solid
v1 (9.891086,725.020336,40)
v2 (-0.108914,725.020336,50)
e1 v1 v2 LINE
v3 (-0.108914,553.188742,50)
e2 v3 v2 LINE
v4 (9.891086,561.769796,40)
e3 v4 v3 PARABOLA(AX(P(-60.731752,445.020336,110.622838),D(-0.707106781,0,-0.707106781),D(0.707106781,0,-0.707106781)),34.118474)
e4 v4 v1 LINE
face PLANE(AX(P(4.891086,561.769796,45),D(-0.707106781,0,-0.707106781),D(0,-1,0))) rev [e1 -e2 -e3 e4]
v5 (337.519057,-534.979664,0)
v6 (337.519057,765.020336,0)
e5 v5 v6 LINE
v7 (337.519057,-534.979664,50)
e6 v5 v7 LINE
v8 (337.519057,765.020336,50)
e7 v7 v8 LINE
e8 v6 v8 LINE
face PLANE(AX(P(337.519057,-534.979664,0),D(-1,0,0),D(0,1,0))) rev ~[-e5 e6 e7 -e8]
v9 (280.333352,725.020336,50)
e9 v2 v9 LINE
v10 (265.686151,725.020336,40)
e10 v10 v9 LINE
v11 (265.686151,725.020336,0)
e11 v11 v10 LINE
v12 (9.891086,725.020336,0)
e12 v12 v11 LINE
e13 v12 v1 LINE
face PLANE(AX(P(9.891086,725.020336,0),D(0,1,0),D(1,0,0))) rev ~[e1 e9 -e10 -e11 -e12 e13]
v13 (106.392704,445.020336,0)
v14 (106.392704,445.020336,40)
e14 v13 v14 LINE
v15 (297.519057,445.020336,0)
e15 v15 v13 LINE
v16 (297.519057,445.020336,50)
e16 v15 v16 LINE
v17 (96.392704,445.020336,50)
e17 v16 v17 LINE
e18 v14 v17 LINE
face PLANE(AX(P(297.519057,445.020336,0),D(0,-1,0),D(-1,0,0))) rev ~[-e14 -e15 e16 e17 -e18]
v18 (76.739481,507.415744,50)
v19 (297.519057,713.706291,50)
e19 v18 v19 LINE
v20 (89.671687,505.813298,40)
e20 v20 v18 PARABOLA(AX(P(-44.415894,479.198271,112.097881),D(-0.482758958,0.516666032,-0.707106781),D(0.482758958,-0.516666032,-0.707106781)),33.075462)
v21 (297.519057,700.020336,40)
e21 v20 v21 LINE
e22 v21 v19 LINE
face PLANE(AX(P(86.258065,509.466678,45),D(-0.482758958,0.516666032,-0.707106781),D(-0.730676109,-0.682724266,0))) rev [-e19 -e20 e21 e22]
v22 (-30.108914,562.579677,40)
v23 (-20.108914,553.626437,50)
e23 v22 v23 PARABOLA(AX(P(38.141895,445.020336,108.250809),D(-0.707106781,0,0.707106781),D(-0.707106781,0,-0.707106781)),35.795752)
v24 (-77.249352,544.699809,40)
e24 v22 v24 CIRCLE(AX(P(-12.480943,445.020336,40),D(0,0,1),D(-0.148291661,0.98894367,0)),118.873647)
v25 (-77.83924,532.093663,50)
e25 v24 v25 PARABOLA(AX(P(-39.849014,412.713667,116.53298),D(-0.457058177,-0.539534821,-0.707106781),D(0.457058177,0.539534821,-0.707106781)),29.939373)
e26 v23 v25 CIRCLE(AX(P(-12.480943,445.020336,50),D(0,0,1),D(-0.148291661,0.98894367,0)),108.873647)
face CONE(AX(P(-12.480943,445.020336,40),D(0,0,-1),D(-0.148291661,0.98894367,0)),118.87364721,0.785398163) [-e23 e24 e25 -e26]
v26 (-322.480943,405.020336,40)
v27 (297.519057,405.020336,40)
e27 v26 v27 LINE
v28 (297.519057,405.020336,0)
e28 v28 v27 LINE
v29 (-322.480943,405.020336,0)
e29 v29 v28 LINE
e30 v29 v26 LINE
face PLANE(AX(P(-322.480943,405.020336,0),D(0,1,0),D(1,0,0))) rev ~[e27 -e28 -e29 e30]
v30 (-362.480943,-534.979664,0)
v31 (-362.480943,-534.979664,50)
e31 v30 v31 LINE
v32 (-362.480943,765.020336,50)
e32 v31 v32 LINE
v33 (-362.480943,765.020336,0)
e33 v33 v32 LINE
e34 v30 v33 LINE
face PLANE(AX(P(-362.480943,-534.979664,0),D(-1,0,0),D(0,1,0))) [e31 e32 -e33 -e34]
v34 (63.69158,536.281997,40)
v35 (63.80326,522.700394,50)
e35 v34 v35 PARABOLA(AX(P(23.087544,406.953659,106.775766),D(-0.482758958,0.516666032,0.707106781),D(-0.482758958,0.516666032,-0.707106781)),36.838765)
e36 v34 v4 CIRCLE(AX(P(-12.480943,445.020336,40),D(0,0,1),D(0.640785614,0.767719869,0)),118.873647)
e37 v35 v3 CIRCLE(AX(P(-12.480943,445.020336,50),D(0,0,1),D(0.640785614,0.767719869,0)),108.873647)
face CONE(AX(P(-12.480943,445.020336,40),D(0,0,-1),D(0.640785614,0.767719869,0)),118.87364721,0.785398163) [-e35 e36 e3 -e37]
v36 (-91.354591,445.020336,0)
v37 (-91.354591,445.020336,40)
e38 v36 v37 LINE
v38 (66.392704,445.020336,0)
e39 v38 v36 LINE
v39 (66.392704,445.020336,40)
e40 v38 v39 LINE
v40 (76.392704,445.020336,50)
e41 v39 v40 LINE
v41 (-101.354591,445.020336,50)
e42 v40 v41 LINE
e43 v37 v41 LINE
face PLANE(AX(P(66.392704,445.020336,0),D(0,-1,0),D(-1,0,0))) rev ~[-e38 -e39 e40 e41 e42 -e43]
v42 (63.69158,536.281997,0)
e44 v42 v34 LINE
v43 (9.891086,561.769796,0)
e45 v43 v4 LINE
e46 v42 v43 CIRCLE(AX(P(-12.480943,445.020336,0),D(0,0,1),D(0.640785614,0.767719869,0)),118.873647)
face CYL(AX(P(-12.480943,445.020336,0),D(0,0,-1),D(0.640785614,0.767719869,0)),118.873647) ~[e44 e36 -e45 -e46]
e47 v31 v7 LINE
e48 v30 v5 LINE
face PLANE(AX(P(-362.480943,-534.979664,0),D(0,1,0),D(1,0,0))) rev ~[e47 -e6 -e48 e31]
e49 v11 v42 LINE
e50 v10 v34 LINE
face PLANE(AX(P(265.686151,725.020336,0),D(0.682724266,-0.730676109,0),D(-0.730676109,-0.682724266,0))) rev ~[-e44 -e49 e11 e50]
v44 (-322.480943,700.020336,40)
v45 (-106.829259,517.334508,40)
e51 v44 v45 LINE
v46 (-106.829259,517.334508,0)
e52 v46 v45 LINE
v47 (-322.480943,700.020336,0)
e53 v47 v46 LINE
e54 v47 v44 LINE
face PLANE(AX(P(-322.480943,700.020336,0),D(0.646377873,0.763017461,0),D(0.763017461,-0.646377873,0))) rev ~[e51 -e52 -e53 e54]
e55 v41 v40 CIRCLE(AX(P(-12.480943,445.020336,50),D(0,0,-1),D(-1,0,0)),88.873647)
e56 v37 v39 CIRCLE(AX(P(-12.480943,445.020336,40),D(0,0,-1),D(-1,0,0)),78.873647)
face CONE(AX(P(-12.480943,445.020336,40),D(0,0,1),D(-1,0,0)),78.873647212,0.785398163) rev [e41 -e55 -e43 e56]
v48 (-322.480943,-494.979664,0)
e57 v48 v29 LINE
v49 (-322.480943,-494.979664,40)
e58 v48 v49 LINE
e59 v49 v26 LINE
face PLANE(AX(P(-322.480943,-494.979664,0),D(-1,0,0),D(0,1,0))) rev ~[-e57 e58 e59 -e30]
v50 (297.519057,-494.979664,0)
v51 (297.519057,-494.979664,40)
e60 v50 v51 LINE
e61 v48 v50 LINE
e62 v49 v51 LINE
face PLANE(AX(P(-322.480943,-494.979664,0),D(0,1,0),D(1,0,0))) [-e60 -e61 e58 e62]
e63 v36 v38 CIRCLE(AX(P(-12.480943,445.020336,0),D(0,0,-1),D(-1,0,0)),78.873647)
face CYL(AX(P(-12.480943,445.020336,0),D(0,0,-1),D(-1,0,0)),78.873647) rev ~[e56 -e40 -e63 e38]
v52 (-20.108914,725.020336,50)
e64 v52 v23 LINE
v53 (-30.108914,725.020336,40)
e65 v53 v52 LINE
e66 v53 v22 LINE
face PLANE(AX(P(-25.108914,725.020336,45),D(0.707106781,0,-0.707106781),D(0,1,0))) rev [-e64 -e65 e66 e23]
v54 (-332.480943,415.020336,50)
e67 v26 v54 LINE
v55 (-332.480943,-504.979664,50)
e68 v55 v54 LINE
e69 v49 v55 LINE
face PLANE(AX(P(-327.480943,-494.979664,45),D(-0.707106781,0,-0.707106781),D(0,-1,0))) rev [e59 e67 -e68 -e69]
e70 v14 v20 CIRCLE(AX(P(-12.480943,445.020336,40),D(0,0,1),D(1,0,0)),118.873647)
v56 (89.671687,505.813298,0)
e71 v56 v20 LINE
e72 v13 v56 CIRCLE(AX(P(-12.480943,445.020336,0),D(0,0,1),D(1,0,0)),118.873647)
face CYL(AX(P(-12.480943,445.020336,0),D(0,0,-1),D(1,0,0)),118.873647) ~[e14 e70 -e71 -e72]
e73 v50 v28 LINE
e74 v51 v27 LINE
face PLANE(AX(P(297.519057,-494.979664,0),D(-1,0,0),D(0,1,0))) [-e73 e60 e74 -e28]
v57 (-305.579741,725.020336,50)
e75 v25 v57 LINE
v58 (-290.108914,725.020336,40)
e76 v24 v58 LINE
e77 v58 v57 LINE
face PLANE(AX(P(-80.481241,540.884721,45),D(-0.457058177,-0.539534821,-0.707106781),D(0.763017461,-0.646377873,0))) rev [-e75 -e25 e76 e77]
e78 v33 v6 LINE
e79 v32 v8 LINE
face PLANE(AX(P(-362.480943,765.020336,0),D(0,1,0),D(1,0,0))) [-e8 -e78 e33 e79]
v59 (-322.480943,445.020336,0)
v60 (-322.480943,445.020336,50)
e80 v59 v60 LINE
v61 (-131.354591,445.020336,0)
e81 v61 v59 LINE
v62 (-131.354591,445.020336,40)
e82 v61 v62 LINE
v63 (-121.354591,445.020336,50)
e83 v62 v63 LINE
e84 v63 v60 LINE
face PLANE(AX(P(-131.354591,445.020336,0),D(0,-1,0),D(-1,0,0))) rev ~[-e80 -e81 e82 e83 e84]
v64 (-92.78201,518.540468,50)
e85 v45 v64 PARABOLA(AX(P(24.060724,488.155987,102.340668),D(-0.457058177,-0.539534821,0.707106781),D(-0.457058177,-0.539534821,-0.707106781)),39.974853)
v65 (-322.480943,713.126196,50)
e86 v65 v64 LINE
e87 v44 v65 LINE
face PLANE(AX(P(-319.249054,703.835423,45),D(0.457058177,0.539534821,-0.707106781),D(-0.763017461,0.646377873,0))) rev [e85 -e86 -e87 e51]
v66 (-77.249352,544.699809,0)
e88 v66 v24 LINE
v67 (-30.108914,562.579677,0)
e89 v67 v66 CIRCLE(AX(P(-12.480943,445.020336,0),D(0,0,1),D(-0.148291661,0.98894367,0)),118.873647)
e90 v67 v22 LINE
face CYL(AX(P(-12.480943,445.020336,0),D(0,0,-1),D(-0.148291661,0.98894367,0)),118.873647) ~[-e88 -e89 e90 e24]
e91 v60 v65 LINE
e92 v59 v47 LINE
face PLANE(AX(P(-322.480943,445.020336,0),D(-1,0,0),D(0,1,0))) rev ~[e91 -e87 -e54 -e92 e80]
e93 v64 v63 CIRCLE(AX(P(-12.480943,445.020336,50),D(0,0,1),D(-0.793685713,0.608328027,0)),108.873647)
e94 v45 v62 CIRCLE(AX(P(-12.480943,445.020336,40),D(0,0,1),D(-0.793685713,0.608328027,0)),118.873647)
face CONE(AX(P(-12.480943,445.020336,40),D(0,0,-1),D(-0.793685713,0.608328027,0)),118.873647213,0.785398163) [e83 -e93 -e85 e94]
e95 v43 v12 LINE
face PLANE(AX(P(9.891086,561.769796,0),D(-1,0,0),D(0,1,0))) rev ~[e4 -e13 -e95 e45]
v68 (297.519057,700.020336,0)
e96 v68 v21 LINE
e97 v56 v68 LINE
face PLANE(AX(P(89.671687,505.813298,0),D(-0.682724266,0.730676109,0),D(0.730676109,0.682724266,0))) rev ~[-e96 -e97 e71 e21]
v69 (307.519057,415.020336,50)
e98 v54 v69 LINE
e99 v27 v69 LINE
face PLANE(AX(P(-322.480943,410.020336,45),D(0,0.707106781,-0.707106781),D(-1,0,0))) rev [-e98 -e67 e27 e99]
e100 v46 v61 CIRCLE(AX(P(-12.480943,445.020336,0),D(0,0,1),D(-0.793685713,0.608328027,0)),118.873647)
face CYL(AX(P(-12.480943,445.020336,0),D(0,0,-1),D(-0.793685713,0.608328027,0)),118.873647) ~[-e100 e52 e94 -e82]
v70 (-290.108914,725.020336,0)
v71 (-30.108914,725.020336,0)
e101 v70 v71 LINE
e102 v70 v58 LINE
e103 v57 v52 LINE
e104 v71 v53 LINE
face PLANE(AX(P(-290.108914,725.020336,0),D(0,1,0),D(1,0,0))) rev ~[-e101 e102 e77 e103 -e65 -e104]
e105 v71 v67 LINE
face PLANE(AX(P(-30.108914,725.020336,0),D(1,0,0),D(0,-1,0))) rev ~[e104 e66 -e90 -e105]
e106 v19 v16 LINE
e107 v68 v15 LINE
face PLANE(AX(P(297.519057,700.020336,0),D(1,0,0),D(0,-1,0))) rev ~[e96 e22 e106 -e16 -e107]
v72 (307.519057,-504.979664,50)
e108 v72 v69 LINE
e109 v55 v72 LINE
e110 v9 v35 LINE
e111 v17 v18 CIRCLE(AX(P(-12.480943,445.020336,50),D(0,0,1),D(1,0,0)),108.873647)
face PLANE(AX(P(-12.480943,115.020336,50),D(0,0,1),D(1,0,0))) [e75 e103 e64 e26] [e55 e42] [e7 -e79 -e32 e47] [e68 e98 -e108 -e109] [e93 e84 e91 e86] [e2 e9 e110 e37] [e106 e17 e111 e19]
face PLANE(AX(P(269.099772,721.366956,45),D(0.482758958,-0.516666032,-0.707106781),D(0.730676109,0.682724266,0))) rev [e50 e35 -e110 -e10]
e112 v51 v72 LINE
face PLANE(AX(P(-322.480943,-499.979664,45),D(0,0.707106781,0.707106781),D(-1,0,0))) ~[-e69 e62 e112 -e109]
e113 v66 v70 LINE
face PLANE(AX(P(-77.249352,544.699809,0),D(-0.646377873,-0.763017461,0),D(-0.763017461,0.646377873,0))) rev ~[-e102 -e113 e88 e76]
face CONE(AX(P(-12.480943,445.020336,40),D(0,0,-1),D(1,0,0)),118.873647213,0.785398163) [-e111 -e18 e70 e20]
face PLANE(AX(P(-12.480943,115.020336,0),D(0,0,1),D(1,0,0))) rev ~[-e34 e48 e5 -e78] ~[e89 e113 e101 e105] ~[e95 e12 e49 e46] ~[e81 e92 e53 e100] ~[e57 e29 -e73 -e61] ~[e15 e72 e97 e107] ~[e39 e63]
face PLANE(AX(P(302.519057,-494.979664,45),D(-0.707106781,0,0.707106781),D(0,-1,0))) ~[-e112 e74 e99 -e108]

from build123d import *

# Parameters (mm, degrees)
F0_W     = 700
F0_H     = 1300
F0_W_2   = 620
F0_H_2   = 900
F1_DEPTH = 50
F2_SIZE  = 10


# Not quite as in the source:
# - a feature names something its author has since deleted; it is built from what else it names


with BuildPart() as f1:
    # F0 (on Top) → F1 (new body)
    with BuildSketch(Plane.XY):
        with Locations((-12.4809433535, 115.0203361814)):
            Rectangle(F0_W, F0_H)
        with Locations((-12.4809433535, -44.9796638186)):
            Rectangle(F0_W_2, F0_H_2, mode=Mode.SUBTRACT)
        Polygon((-131.3545905658, 445.0203361814), (-322.4809433535, 445.0203361814), (-322.4809433535, 700.0203361814), (-322.4809433535, 725.0203361814), (-290.108913989, 725.0203361814), (-30.108913989, 725.0203361814), (9.891086011, 725.0203361814), (265.6861508147, 725.0203361814), (297.5190566465, 725.0203361814), (297.5190566465, 700.0203361814), (297.5190566465, 445.0203361814), (106.3927038589, 445.0203361814), (66.3927038589, 445.0203361814), (-91.3545905658, 445.0203361814), align=None, mode=Mode.SUBTRACT)
        with BuildLine():
            Line((-322.4809433535, 725.0203361814), (-322.4809433535, 700.0203361814))
            Line((-322.4809433535, 700.0203361814), (-106.829258799, 517.3345075045))
            ThreePointArc((-106.829258799, 517.3345075045), (-93.2073200284, 532.2796973439), (-77.2493518889, 544.6998087791))
            Line((-77.2493518889, 544.6998087791), (-290.108913989, 725.0203361814))
            Line((-290.108913989, 725.0203361814), (-322.4809433535, 725.0203361814))
        make_face()
        with BuildLine():
            ThreePointArc((-106.829258799, 517.3345075045), (-125.0564121886, 483.2002761775), (-131.3545905658, 445.0203361814))
            Line((-131.3545905658, 445.0203361814), (-91.3545905658, 445.0203361814))
            ThreePointArc((-91.3545905658, 445.0203361814), (-12.4809433535, 523.8939833937), (66.3927038589, 445.0203361814))
            Line((66.3927038589, 445.0203361814), (106.3927038589, 445.0203361814))
            ThreePointArc((106.3927038589, 445.0203361814), (102.1362449296, 476.5456300205), (89.6716866284, 505.8132978575))
            ThreePointArc((89.6716866284, 505.8132978575), (77.9737439548, 522.1494068715), (63.691579675, 536.2819970091))
            ThreePointArc((63.691579675, 536.2819970091), (38.4127121689, 552.4483578012), (9.891086011, 561.7697957248))
            ThreePointArc((9.891086011, 561.7697957248), (-10.0745975152, 563.8696252044), (-30.108913989, 562.5796771664))
            ThreePointArc((-30.108913989, 562.5796771664), (-54.6379504639, 556.16767422), (-77.2493518889, 544.6998087791))
            ThreePointArc((-77.2493518889, 544.6998087791), (-93.2073200284, 532.2796973439), (-106.829258799, 517.3345075045))
        make_face()
        with BuildLine():
            Line((-30.108913989, 725.0203361814), (-30.108913989, 562.5796771664))
            ThreePointArc((-30.108913989, 562.5796771664), (-10.0745975152, 563.8696252044), (9.891086011, 561.7697957248))
            Line((9.891086011, 561.7697957248), (9.891086011, 725.0203361814))
            Line((9.891086011, 725.0203361814), (-30.108913989, 725.0203361814))
        make_face()
        with BuildLine():
            ThreePointArc((63.691579675, 536.2819970091), (77.9737439548, 522.1494068715), (89.6716866284, 505.8132978575))
            Line((89.6716866284, 505.8132978575), (297.5190566465, 700.0203361814))
            Line((297.5190566465, 700.0203361814), (297.5190566465, 725.0203361814))
            Line((297.5190566465, 725.0203361814), (265.6861508147, 725.0203361814))
            Line((265.6861508147, 725.0203361814), (63.691579675, 536.2819970091))
        make_face()
    extrude(amount=F1_DEPTH)

    # F2
    f2_edges = [f1.edges().sort_by_distance(p)[0] for p in [
        (-12.480943, 405.020336, 50),
        (297.519057, -44.979664, 50),
        (-12.480943, -494.979664, 50),
        (-322.480943, -44.979664, 50),
        (-12.480943, 523.893983, 50),
        (-54.63795, 556.167674, 50),
        (102.136245, 476.54563, 50),
        (-214.655101, 608.677422, 50),
        (-183.679133, 634.860072, 50),
        (-30.108914, 643.800007, 50),
        (38.412712, 552.448358, 50),
        (-125.056412, 483.200276, 50),
        (193.595372, 602.916817, 50),
        (164.688865, 630.651167, 50),
        (9.891086, 643.395066, 50),
    ]]
    chamfer(f2_edges, length=F2_SIZE)


solid = f1.part
